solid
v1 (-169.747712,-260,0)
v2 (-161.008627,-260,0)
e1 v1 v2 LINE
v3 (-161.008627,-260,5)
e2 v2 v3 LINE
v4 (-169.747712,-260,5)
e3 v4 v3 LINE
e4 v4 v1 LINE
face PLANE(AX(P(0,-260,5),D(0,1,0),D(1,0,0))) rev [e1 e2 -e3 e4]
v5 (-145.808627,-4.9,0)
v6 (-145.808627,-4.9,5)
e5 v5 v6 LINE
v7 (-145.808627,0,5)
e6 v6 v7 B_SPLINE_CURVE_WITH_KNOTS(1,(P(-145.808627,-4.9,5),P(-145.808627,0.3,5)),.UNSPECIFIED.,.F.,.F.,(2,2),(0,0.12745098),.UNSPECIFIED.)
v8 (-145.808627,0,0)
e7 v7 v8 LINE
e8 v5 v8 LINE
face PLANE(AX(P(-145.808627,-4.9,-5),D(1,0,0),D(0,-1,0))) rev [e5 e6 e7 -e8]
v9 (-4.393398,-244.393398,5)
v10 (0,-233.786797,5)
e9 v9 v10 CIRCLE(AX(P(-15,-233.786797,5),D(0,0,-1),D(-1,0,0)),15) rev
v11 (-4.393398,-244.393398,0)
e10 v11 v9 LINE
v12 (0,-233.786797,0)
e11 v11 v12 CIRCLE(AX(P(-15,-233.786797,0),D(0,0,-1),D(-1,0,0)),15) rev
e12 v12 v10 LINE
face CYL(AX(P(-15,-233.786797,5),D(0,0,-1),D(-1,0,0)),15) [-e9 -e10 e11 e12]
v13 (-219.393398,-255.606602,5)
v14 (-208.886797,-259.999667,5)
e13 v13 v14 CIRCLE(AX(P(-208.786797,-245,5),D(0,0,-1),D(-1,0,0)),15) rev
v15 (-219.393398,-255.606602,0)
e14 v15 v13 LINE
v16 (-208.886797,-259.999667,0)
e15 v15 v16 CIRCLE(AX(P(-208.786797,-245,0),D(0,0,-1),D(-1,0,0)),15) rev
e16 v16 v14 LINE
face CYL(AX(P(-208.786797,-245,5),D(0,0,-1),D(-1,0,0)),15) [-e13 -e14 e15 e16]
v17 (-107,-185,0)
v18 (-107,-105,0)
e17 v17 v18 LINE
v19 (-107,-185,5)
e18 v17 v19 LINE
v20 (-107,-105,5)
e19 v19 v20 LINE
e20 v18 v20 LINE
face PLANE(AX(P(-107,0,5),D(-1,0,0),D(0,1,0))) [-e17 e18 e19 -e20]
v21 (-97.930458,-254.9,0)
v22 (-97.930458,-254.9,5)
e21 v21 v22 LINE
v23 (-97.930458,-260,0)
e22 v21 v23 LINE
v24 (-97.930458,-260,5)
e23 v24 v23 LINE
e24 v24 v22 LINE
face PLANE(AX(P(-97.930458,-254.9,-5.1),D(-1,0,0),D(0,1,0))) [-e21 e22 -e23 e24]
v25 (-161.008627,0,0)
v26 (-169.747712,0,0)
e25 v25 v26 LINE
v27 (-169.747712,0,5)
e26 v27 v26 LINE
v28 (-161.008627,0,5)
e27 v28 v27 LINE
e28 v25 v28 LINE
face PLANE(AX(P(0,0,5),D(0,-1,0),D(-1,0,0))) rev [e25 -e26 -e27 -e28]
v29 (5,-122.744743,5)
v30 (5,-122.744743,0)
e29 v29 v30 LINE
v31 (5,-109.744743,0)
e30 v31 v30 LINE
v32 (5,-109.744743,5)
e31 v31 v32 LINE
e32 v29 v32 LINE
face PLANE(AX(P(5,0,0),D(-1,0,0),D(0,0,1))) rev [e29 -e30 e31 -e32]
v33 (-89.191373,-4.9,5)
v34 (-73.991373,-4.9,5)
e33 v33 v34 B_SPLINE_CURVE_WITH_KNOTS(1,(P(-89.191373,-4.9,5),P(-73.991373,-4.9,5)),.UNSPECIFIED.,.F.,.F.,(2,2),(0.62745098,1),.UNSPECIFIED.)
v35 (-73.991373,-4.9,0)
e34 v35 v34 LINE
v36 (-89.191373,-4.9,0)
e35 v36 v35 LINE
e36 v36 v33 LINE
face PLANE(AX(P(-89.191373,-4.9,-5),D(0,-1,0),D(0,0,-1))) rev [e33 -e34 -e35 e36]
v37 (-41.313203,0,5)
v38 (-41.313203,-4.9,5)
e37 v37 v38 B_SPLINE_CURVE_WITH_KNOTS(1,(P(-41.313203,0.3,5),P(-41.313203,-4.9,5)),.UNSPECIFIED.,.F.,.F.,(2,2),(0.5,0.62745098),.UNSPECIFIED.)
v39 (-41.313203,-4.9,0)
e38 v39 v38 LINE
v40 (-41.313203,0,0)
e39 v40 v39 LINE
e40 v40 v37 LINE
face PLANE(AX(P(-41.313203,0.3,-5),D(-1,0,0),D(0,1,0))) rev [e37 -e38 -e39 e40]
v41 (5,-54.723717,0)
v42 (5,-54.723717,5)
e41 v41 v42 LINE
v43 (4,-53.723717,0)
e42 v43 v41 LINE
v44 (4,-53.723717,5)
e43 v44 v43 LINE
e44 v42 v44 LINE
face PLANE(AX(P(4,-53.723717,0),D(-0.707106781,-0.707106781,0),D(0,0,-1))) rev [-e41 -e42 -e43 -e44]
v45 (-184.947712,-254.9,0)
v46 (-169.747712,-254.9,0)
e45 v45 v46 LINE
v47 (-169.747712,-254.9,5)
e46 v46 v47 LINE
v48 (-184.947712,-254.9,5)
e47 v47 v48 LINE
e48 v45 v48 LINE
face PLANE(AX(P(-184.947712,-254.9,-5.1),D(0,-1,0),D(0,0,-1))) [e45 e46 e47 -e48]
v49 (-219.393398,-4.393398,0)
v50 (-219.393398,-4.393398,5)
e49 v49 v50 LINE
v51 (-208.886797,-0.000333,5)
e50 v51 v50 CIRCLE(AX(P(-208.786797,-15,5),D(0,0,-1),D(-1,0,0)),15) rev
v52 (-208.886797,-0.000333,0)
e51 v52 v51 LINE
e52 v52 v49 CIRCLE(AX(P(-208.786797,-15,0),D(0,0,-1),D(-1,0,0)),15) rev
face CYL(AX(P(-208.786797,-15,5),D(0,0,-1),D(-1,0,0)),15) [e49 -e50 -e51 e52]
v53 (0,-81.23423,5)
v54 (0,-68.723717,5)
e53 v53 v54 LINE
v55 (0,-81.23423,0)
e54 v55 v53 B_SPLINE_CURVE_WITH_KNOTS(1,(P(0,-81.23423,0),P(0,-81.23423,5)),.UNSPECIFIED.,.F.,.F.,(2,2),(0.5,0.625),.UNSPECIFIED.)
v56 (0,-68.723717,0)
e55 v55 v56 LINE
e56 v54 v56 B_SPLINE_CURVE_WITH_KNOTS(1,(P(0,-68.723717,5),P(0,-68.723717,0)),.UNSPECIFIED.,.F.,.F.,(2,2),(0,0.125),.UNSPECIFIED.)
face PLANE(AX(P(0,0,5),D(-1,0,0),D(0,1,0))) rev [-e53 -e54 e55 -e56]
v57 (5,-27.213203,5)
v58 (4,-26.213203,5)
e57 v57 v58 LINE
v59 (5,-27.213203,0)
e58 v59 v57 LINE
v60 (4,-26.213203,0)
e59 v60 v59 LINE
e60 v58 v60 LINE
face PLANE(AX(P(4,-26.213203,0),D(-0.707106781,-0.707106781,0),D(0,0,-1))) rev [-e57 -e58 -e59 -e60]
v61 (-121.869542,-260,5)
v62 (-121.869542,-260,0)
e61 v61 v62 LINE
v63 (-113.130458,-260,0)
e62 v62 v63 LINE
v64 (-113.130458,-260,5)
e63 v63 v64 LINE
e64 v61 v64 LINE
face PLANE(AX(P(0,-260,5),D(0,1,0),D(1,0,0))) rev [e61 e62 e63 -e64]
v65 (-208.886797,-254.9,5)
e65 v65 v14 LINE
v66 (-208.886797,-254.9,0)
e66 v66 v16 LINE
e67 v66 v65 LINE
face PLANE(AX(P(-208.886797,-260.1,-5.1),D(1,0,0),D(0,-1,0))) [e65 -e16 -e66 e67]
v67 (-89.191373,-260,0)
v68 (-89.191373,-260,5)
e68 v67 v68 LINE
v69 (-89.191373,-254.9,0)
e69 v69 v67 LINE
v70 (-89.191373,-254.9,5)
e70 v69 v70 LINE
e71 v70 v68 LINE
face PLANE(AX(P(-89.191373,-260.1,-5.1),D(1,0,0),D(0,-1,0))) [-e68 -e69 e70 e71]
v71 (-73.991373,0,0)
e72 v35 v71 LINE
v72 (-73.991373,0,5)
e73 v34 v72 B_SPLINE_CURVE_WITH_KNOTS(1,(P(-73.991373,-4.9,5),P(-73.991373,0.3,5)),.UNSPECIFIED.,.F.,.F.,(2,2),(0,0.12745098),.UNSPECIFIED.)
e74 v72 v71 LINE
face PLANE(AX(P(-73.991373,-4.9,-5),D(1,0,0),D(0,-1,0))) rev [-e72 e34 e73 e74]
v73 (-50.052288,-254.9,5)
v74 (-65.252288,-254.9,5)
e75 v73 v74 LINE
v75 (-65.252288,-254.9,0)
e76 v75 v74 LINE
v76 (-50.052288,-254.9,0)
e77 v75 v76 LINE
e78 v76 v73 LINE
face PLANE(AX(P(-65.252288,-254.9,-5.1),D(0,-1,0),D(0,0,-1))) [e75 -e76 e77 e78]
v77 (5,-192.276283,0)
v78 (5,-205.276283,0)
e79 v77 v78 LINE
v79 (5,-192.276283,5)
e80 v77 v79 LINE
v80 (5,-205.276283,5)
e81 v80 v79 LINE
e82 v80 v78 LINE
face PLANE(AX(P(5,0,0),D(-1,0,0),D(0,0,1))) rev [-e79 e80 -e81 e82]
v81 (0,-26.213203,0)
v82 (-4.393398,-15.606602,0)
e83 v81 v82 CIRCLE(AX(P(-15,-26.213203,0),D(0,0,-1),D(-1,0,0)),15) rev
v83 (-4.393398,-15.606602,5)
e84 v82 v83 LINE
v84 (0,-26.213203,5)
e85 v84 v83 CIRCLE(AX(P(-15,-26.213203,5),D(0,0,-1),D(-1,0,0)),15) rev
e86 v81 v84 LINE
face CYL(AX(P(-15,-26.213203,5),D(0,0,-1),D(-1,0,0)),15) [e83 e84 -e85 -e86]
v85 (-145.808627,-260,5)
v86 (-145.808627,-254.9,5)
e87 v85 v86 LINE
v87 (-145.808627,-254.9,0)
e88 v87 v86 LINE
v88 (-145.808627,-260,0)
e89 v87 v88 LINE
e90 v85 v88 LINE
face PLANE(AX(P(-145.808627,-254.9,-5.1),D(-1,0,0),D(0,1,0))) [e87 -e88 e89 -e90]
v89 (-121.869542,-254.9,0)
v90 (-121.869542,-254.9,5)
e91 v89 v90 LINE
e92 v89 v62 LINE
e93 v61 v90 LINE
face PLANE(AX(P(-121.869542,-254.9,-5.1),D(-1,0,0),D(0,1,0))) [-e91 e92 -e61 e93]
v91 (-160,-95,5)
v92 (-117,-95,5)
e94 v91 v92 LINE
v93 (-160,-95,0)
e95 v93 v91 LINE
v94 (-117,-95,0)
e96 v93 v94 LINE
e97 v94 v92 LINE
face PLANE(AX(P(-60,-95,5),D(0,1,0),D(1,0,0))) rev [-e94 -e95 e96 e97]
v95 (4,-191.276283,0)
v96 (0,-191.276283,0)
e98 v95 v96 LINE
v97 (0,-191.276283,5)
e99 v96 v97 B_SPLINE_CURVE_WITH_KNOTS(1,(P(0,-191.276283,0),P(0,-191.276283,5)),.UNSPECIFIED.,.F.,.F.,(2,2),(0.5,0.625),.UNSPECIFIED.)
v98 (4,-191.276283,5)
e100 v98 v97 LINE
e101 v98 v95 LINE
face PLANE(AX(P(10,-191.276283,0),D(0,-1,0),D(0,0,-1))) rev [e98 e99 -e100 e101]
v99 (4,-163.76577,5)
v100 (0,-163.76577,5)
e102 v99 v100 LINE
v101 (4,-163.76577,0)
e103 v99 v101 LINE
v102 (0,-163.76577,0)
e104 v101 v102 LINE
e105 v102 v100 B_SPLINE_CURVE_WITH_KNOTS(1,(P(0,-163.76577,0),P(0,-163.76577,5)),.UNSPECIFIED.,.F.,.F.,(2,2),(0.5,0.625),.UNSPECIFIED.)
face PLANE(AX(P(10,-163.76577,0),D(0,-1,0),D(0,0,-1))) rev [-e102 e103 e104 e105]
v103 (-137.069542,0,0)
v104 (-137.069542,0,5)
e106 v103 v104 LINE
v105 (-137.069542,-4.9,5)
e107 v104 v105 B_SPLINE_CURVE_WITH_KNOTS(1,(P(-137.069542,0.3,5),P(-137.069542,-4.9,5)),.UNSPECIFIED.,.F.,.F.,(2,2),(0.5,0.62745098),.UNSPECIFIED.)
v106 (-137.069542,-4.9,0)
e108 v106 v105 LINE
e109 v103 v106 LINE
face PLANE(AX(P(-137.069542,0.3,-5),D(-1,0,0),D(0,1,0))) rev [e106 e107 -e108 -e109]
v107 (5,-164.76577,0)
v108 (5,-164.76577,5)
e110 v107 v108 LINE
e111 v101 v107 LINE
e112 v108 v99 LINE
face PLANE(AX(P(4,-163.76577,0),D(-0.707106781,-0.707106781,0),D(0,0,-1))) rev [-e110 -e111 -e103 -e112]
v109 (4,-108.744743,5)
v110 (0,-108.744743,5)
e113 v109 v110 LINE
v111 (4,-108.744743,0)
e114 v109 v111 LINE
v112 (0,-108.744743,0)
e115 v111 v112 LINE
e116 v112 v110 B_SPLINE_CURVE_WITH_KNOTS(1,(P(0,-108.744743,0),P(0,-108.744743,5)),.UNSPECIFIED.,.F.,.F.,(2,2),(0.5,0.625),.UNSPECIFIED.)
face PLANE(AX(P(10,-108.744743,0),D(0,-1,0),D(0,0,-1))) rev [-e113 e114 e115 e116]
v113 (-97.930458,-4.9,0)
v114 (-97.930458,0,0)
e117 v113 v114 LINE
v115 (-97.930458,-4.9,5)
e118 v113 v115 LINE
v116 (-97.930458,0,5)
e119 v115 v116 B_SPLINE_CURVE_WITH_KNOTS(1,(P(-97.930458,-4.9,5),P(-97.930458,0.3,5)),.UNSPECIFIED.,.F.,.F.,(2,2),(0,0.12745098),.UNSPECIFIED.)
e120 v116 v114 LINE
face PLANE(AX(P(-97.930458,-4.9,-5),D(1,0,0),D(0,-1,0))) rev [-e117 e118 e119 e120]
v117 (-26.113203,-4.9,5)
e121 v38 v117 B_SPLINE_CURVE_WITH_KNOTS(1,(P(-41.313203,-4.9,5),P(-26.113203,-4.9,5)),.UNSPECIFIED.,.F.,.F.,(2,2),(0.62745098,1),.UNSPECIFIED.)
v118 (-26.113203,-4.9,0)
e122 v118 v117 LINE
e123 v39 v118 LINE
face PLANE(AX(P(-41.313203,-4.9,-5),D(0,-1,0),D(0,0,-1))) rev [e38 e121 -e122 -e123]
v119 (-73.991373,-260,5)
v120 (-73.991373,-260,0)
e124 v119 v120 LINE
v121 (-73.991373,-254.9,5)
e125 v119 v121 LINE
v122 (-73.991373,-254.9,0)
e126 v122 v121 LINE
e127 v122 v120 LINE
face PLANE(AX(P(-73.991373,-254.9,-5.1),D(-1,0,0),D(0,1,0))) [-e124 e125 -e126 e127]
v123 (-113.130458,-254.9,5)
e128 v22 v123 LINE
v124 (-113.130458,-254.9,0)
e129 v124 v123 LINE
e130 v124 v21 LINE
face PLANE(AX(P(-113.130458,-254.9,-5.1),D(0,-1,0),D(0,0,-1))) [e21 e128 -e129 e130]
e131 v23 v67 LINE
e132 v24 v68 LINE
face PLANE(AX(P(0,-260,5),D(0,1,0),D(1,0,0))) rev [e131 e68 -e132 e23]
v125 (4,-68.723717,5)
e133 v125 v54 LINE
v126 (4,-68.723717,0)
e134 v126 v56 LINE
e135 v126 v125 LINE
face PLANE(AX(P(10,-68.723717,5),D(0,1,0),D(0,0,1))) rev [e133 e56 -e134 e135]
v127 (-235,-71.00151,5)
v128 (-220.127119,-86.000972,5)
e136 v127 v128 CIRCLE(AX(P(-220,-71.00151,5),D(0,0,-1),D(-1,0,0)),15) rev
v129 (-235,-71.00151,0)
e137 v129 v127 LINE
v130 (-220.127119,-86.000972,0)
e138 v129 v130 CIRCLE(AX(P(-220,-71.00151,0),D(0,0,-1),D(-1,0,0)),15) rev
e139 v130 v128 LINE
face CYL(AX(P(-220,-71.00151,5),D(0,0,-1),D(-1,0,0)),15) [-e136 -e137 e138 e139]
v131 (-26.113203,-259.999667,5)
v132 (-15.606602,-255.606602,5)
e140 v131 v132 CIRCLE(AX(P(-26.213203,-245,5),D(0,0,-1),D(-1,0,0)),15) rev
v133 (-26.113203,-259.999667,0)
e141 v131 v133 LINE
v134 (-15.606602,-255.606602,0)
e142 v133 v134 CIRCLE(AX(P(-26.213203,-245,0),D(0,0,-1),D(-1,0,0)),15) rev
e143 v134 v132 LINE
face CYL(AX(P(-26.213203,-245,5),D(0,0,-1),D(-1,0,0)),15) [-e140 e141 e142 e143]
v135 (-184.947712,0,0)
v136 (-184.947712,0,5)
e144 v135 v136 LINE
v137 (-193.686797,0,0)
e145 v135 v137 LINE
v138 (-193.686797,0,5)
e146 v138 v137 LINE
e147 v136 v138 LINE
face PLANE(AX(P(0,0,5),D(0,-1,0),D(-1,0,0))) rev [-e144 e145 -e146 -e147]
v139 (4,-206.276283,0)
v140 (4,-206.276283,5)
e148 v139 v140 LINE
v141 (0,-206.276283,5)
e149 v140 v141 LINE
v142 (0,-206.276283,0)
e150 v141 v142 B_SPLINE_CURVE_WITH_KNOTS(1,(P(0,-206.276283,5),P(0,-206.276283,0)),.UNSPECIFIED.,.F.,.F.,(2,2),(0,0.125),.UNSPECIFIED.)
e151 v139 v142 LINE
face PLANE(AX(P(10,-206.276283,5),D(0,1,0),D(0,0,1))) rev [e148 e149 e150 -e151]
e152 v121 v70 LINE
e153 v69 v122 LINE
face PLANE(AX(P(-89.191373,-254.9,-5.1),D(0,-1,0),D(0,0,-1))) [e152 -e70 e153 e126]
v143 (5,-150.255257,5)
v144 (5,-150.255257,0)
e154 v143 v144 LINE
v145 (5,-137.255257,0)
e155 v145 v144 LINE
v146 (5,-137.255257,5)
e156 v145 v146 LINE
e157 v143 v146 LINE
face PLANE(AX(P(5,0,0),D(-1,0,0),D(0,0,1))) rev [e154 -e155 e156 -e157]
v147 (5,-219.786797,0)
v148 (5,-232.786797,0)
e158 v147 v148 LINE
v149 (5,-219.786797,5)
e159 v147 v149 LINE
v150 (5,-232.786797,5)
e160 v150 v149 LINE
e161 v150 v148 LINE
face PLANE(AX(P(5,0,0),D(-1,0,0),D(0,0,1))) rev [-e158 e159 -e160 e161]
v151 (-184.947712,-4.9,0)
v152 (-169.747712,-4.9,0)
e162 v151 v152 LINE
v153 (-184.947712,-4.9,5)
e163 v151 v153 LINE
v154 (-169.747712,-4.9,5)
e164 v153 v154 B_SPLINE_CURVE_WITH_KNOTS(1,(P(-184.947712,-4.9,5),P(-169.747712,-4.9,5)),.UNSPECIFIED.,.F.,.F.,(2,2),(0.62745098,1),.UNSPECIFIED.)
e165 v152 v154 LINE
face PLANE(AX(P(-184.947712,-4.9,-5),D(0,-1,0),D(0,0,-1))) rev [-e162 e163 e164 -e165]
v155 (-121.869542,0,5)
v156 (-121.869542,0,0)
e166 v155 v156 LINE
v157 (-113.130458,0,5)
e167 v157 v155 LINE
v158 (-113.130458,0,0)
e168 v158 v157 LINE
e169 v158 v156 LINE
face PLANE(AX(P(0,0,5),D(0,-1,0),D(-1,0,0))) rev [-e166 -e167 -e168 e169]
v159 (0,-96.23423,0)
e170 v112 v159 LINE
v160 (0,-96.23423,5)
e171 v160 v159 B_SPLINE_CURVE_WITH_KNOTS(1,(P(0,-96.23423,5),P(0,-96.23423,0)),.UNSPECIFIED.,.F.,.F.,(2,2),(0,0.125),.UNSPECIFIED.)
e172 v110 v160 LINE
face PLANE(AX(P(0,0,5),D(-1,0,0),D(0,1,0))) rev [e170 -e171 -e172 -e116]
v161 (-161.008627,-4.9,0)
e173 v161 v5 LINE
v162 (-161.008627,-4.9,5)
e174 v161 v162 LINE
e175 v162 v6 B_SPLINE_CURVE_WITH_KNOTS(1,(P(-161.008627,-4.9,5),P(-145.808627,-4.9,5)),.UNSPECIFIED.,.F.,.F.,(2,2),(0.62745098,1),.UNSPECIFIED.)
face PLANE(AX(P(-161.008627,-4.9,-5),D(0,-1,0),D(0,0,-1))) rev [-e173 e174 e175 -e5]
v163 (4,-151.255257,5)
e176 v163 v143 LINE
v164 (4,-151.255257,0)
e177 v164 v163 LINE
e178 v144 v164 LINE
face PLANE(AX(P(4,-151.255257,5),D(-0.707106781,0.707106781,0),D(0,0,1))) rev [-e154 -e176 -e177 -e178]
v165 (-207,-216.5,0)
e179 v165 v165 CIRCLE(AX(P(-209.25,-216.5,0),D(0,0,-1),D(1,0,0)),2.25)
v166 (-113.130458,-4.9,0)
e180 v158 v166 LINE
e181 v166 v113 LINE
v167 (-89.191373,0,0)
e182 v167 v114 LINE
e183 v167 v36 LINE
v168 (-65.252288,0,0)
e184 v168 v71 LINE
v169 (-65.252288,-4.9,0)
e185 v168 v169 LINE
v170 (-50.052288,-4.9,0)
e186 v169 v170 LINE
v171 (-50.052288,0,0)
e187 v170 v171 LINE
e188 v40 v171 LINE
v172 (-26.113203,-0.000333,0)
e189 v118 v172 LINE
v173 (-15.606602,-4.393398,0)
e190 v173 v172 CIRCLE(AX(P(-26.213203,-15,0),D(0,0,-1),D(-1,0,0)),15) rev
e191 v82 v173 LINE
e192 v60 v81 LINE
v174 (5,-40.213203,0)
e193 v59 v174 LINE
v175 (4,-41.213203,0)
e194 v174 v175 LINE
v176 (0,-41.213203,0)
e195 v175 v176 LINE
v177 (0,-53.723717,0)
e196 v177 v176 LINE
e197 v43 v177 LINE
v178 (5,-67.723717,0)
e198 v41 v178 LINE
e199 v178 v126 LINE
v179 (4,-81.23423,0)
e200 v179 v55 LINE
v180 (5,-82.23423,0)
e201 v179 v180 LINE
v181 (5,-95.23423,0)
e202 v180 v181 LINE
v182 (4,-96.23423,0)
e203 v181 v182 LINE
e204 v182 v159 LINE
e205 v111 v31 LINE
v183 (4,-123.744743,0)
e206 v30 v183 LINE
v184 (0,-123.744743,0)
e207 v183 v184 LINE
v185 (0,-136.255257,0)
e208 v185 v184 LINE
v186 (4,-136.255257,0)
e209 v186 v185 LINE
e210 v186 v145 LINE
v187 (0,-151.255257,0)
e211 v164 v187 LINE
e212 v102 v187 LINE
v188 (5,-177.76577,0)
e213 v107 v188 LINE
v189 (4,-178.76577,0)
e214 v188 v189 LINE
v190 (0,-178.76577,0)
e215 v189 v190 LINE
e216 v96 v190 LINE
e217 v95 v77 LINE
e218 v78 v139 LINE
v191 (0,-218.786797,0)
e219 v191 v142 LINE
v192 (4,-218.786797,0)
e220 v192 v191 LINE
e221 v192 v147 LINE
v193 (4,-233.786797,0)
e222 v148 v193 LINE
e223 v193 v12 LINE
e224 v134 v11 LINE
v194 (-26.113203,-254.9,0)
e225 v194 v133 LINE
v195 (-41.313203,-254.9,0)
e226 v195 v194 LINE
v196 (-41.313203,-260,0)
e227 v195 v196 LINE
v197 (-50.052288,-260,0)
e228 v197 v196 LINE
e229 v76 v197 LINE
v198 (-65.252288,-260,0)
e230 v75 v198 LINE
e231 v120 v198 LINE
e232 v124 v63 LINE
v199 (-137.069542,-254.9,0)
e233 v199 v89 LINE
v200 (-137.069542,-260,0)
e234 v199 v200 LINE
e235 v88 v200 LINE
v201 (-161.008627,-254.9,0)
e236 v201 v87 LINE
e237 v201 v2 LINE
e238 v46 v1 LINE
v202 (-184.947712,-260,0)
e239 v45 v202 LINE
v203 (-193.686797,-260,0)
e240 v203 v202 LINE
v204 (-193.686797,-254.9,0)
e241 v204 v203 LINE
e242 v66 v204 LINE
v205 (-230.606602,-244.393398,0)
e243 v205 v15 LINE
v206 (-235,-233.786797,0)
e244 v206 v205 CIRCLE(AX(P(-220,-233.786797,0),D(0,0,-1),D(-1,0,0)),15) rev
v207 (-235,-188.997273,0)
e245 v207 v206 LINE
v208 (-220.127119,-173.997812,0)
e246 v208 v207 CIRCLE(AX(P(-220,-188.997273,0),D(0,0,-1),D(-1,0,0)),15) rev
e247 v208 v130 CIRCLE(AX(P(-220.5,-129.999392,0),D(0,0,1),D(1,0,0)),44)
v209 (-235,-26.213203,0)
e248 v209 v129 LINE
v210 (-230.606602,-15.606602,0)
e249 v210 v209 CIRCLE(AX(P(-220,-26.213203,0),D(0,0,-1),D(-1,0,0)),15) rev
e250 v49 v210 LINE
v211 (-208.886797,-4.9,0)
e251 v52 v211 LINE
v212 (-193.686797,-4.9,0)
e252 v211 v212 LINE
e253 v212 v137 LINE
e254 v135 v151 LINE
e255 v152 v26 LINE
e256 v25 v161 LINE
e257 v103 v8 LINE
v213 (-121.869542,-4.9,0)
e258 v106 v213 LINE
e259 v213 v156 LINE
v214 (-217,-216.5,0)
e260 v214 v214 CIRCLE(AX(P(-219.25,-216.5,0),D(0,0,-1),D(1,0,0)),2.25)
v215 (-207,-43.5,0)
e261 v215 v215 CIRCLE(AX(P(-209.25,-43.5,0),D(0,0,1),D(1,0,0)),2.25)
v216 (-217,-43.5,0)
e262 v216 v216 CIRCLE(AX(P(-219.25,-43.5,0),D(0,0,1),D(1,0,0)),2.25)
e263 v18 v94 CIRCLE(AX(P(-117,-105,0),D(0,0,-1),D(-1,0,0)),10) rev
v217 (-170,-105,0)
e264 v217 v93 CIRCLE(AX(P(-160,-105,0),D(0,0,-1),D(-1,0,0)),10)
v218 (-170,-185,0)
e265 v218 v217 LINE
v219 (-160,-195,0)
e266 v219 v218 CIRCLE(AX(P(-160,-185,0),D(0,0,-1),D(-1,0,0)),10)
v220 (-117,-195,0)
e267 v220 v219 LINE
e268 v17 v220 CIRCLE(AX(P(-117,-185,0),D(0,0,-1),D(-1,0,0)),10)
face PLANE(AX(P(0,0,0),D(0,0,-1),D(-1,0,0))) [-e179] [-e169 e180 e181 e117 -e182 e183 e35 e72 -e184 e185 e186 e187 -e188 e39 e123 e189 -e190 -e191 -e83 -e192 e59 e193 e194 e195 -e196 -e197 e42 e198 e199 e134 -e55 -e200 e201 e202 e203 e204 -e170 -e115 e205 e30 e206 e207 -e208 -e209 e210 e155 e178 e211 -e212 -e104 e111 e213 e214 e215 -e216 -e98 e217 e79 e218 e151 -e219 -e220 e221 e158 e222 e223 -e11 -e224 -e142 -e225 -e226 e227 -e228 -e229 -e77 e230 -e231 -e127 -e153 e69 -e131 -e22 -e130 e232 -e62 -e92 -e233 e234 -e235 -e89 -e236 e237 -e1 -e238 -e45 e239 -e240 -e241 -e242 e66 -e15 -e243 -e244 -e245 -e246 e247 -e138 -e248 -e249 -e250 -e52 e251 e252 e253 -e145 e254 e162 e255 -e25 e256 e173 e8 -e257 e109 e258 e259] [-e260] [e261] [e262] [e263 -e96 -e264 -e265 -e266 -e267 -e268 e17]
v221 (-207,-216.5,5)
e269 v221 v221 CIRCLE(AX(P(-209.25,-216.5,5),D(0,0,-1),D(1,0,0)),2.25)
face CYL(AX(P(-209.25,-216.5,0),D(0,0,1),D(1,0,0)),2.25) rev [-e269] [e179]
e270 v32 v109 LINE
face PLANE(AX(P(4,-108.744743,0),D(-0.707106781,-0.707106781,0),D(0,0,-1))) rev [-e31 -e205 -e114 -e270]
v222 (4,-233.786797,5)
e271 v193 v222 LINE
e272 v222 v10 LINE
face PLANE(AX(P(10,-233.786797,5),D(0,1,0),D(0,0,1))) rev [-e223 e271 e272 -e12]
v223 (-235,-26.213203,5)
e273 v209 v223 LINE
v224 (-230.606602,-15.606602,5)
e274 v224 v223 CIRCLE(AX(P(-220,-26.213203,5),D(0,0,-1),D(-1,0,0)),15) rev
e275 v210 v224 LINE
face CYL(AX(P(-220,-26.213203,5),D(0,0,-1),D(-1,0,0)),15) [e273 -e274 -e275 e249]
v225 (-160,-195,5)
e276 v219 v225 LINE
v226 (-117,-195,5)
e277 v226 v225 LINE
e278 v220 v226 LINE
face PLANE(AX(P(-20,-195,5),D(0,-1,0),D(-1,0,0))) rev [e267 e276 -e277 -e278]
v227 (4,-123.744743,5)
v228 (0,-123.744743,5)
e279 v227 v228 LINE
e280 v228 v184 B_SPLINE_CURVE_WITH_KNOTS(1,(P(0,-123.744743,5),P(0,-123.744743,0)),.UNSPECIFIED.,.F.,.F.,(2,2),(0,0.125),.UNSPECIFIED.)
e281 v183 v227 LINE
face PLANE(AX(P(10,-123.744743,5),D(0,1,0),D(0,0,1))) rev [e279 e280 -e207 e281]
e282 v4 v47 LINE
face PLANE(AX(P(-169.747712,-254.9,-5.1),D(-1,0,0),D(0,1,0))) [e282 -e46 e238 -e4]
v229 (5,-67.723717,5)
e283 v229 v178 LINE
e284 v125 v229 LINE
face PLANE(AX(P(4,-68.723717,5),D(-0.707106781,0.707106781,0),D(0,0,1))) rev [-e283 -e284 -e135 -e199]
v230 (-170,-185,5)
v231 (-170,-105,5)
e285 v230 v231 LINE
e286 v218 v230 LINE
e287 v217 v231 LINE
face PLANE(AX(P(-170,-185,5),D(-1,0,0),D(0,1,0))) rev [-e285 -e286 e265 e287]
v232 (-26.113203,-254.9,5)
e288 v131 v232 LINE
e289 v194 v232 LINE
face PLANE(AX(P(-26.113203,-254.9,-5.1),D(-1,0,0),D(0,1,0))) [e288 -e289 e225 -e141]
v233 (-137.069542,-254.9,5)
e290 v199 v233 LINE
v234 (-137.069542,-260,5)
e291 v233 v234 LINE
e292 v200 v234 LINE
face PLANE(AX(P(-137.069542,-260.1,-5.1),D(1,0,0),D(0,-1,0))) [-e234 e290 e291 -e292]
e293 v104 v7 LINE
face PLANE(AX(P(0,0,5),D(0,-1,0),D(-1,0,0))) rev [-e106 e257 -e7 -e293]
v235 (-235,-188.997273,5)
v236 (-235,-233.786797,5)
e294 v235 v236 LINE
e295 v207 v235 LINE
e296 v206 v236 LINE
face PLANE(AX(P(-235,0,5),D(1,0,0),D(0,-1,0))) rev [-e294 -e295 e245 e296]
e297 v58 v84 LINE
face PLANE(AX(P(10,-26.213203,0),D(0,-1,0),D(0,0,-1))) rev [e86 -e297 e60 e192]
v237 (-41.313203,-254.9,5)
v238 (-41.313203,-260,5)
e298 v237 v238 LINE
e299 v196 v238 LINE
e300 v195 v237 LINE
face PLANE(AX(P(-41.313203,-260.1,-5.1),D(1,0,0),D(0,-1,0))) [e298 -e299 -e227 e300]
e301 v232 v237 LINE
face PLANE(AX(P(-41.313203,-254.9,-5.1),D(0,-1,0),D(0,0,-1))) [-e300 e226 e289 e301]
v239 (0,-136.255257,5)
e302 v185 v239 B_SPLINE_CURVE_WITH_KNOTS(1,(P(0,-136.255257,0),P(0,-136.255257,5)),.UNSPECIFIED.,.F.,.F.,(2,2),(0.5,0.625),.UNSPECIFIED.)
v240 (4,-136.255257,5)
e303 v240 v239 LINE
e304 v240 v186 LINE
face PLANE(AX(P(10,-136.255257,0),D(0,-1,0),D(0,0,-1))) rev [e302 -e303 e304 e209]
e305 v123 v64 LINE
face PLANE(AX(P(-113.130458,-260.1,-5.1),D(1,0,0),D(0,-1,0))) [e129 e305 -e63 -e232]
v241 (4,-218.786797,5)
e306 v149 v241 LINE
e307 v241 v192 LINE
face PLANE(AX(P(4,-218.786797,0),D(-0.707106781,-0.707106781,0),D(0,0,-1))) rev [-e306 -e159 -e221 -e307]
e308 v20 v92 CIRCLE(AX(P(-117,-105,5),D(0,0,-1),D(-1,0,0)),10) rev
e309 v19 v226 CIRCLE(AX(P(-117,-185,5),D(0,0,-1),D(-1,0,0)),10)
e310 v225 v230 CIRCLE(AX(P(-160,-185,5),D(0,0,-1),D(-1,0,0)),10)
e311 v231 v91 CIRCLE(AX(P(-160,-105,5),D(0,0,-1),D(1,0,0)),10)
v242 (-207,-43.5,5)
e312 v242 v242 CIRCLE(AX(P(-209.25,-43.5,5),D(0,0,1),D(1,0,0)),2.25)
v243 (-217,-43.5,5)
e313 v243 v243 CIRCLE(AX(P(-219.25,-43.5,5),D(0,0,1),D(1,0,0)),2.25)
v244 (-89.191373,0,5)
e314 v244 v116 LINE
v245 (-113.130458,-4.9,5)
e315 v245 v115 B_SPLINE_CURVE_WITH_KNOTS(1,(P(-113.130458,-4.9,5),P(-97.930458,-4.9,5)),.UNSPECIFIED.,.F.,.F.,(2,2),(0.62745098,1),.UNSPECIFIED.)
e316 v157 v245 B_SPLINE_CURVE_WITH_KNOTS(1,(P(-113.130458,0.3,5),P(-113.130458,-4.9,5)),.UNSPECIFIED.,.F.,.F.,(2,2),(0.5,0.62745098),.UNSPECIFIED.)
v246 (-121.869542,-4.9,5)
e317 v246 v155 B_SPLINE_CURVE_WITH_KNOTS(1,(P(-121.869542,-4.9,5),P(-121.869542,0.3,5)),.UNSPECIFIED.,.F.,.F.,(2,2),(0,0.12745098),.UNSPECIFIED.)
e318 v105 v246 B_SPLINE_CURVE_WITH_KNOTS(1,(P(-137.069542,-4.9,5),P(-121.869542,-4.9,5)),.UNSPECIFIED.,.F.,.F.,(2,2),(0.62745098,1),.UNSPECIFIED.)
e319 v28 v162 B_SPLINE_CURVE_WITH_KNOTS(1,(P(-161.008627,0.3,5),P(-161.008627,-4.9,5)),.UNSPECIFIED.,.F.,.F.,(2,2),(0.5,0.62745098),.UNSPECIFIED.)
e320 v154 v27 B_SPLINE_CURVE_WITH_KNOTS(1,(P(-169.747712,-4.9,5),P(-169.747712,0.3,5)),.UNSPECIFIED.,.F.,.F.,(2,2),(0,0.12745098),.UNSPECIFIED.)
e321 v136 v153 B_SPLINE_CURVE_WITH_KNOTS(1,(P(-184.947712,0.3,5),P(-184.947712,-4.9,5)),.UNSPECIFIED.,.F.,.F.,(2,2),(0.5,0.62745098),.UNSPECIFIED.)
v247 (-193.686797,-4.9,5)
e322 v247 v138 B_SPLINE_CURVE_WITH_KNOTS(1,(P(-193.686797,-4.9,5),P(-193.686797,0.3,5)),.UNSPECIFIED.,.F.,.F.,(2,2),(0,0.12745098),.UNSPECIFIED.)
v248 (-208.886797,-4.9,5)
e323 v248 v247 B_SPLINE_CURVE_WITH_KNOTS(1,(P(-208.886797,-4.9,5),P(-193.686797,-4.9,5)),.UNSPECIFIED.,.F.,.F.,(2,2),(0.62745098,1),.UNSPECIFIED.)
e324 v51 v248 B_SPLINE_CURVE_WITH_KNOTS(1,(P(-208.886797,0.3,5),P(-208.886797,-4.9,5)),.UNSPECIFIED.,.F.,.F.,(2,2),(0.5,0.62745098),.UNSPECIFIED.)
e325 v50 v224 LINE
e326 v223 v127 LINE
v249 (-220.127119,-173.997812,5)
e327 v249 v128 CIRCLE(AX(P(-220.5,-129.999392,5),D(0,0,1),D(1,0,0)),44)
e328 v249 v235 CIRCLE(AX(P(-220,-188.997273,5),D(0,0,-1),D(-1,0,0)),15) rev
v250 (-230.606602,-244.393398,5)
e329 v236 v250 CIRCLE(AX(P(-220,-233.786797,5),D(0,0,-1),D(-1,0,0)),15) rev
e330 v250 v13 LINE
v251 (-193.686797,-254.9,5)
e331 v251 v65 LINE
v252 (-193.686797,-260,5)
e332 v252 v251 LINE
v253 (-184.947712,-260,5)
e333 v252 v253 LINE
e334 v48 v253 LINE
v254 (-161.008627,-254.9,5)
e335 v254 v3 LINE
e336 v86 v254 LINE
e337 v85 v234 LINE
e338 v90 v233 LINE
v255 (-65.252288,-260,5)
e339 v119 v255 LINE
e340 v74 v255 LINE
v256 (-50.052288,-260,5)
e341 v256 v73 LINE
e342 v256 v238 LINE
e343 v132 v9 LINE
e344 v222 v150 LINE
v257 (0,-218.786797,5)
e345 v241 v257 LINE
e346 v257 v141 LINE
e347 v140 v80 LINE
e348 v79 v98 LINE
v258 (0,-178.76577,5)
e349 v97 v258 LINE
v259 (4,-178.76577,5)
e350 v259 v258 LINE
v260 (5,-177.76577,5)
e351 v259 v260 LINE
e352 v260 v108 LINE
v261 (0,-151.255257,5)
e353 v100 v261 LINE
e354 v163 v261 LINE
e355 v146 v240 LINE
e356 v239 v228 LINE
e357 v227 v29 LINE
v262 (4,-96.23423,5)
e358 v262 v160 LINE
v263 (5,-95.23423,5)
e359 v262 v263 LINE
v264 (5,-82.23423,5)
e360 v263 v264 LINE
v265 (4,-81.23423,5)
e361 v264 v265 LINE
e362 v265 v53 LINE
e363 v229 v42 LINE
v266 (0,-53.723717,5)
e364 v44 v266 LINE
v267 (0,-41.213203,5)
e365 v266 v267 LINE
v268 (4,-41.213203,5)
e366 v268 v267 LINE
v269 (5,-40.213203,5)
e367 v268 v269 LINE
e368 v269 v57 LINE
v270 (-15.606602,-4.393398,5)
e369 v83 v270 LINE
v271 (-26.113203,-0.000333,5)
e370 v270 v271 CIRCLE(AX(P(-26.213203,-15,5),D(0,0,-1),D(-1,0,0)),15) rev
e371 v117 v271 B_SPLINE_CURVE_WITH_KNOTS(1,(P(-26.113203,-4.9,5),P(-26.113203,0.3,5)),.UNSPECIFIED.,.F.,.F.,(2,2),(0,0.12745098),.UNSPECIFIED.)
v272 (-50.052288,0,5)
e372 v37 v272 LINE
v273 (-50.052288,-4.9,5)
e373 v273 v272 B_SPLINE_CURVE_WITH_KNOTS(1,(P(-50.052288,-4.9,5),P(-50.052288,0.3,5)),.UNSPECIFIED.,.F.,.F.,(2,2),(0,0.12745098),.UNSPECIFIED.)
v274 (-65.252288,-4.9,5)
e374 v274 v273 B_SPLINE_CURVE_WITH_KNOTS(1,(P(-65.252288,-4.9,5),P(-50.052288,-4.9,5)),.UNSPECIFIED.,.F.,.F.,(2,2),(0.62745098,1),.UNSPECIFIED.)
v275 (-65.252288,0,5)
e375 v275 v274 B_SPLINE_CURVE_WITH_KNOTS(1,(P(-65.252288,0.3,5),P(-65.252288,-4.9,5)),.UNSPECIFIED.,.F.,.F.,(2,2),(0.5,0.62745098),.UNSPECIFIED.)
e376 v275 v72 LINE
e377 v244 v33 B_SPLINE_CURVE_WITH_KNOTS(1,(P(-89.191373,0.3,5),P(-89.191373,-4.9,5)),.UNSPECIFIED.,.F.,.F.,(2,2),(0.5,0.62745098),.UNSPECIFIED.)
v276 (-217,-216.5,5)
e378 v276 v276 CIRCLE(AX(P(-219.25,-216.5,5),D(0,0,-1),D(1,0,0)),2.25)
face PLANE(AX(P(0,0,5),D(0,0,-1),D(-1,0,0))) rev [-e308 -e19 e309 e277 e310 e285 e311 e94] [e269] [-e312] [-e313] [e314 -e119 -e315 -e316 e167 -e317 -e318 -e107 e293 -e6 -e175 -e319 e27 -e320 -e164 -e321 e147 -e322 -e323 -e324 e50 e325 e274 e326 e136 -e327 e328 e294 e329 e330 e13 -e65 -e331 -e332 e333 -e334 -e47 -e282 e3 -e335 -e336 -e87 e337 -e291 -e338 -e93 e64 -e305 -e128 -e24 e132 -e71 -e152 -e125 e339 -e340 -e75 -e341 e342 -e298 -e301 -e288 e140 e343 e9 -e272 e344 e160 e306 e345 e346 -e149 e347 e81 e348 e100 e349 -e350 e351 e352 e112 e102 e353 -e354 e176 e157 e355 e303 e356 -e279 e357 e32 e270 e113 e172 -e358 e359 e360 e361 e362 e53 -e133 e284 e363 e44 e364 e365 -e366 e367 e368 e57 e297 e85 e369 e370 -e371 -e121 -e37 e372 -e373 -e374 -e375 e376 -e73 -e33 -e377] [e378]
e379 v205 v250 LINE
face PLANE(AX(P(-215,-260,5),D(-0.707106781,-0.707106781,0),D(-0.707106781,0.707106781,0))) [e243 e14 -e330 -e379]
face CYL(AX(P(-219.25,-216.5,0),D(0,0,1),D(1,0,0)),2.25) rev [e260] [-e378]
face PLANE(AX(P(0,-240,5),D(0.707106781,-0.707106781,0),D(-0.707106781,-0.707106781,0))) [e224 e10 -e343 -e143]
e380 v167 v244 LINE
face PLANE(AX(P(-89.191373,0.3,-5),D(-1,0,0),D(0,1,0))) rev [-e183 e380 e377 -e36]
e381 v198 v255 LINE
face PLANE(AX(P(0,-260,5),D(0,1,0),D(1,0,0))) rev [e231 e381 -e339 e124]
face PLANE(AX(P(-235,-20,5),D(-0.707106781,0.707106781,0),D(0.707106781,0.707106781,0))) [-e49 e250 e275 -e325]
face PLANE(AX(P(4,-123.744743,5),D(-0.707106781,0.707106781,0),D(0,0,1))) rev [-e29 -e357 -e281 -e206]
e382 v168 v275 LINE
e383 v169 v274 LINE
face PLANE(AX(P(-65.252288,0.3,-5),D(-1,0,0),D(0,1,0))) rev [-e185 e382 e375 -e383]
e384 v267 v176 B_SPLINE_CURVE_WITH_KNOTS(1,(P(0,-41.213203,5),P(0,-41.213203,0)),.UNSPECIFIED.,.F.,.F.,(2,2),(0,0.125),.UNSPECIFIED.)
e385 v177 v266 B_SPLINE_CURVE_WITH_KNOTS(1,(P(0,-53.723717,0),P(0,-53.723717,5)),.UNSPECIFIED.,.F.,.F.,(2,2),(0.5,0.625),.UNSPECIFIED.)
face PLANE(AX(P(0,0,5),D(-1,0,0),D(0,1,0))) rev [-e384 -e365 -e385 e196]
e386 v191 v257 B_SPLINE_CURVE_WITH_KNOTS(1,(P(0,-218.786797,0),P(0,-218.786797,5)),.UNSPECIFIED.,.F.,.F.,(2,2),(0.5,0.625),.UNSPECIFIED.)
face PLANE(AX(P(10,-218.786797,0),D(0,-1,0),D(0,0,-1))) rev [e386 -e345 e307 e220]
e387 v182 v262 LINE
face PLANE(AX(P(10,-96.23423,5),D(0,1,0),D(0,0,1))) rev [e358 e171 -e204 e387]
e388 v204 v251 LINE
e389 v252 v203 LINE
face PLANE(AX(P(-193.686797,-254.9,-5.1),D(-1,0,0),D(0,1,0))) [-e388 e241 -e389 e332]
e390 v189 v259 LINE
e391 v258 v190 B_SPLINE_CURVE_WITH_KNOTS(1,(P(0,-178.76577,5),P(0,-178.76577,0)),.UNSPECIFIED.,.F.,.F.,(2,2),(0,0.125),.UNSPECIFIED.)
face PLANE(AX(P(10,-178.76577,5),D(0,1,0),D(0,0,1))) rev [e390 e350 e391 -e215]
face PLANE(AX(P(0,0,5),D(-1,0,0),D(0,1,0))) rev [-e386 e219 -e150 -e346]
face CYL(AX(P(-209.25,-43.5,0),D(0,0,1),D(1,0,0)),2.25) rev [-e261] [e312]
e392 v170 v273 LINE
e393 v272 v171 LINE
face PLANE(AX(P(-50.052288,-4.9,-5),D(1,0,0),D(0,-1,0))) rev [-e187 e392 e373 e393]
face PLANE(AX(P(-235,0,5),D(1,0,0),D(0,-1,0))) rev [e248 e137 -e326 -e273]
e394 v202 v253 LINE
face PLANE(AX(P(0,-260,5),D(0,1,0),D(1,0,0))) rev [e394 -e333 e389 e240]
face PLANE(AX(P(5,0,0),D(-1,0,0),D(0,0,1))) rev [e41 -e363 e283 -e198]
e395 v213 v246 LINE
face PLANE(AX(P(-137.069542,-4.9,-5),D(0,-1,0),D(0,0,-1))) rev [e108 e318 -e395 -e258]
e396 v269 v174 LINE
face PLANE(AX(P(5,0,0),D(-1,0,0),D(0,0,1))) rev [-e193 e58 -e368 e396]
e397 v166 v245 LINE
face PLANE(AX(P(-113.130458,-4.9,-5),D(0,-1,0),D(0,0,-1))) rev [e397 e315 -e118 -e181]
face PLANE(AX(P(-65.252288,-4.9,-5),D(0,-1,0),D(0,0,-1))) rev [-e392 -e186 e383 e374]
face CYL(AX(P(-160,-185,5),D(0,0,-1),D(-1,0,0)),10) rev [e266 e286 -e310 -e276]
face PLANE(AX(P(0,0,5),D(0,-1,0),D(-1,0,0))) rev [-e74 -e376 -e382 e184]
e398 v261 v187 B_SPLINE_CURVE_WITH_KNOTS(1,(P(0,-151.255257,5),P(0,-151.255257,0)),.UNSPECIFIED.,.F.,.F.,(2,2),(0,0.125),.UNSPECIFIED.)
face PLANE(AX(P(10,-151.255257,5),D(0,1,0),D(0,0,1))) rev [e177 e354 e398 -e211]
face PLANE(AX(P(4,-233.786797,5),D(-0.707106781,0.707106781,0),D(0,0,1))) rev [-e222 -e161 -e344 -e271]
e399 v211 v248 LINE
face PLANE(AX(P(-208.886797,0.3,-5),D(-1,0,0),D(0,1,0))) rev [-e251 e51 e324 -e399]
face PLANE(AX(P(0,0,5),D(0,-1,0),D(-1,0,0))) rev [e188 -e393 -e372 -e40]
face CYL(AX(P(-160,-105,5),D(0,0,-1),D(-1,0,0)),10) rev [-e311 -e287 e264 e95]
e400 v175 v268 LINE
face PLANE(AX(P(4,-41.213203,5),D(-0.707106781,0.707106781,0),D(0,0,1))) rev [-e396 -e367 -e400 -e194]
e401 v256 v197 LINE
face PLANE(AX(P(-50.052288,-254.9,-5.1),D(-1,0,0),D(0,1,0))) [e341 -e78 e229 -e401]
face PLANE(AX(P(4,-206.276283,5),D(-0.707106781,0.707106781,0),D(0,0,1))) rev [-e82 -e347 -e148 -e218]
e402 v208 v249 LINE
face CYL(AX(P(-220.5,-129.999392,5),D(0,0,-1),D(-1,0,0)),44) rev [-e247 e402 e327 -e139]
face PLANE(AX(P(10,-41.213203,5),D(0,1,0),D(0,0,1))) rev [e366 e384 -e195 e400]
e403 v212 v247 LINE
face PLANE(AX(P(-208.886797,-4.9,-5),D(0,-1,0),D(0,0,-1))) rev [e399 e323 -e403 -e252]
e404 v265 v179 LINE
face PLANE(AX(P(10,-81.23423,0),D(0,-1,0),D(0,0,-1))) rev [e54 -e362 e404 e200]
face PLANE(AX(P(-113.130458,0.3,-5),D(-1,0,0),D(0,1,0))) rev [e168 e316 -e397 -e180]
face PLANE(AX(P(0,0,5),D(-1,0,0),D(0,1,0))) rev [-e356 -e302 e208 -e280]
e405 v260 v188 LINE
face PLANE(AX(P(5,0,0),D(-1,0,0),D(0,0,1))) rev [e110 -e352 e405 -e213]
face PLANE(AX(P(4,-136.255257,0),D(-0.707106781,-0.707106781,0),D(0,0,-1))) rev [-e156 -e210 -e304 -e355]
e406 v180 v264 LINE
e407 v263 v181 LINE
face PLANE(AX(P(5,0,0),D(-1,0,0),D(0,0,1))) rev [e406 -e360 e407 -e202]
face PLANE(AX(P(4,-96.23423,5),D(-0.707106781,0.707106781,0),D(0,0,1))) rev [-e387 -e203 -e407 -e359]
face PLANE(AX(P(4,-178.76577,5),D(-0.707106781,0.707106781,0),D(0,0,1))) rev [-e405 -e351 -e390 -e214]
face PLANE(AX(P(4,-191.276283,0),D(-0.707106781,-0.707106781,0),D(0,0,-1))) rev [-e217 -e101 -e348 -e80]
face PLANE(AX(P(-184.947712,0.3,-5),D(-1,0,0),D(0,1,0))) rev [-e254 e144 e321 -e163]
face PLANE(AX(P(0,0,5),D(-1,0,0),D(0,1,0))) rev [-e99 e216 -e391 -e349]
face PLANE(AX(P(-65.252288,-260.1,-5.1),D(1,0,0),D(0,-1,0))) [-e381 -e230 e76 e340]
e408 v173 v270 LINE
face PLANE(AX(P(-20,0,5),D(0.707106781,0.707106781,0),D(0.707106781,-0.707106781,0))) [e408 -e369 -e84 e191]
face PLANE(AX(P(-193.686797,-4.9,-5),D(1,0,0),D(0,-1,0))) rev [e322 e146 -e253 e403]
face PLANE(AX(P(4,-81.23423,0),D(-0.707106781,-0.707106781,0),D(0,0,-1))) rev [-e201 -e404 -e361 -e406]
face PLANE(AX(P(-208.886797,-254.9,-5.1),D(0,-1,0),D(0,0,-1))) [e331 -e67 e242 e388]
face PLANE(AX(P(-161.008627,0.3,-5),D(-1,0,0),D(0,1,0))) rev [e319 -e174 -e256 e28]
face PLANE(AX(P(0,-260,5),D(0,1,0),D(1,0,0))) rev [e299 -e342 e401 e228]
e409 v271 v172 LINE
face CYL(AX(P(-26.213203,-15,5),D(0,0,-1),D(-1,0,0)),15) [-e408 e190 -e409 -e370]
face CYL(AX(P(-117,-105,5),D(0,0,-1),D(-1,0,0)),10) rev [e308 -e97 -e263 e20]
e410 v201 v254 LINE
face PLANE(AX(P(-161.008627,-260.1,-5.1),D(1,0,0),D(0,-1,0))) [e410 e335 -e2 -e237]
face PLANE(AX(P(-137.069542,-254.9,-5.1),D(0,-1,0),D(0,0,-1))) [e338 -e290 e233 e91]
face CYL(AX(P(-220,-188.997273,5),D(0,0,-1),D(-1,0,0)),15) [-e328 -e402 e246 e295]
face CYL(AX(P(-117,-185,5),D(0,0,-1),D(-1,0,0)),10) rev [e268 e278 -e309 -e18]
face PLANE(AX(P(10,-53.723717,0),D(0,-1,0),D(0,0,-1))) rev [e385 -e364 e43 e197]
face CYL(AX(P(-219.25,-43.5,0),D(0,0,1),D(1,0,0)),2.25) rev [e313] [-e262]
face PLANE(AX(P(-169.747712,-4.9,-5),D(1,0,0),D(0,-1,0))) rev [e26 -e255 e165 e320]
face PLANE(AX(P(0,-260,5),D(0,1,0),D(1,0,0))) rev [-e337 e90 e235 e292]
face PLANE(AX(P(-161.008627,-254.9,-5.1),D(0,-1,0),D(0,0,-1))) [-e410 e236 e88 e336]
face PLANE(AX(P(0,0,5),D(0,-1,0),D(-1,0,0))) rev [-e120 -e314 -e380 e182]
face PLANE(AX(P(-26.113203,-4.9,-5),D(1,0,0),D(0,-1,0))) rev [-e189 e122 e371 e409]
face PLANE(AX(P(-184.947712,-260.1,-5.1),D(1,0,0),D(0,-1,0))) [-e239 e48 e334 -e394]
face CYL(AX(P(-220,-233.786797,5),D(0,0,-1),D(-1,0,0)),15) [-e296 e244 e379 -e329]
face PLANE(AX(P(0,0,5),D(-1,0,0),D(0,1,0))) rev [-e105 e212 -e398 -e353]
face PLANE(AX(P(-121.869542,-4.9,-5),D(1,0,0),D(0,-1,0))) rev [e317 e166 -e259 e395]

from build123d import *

# Parameters (mm, degrees)
ESQUISSE1_W                            = 235
ESQUISSE1_H                            = 260
BOSS_EXTRU_1_DEPTH                     = 5
ENL_V_MAT_EXTRU_1_DEPTH                = 351.499643366
CHANFREIN1_SIZE                        = 20
CONG_1_R                               = 15
CHANFREIN2_SIZE                        = 20
CONG_2_R                               = 15
ENL_V_MAT_EXTRU_2_DEPTH                = 351.499643366
CHANFREIN3_SIZE                        = 20
CHANFREIN4_SIZE                        = 20
CONG_3_R                               = 15
BOSS_EXTRU_3_DEPTH                     = 5
TENON_ET_MORTAISE_TENON1_DEPTH         = 5
TENON_START                            = -260
TENON_ET_MORTAISE_RAINURE1_OUTLINE_W   = 15.2
TENON_ET_MORTAISE_RAINURE1_OUTLINE_H   = 5
TENON_ET_MORTAISE_RAINURE1_DEPTH       = 5.1
TENON_START_2                          = -208.886796564
TENON_ET_MORTAISE_RAINURE2_OUTLINE_W   = 4.9
TENON_ET_MORTAISE_RAINURE2_OUTLINE_H   = 5
TENON_ET_MORTAISE_RAINURE2_DEPTH       = 15.2
TENON_START_3                          = -184.947711832
TENON_ET_MORTAISE_RAINURE2_2_OUTLINE_W = 4.9
TENON_ET_MORTAISE_RAINURE2_2_OUTLINE_H = 5
TENON_ET_MORTAISE_RAINURE2_2_DEPTH     = 15.2
TENON_START_4                          = -161.008627099
TENON_ET_MORTAISE_RAINURE2_3_OUTLINE_W = 4.9
TENON_ET_MORTAISE_RAINURE2_3_OUTLINE_H = 5
TENON_ET_MORTAISE_RAINURE2_3_DEPTH     = 15.2
TENON_START_5                          = -137.069542366
TENON_ET_MORTAISE_RAINURE2_4_OUTLINE_W = 4.9
TENON_ET_MORTAISE_RAINURE2_4_OUTLINE_H = 5
TENON_ET_MORTAISE_RAINURE2_4_DEPTH     = 15.2
TENON_START_6                          = -113.130457634
TENON_ET_MORTAISE_RAINURE2_5_OUTLINE_W = 4.9
TENON_ET_MORTAISE_RAINURE2_5_OUTLINE_H = 5
TENON_ET_MORTAISE_RAINURE2_5_DEPTH     = 15.2
TENON_START_7                          = -89.191372901
TENON_ET_MORTAISE_RAINURE2_6_OUTLINE_W = 4.9
TENON_ET_MORTAISE_RAINURE2_6_OUTLINE_H = 5
TENON_ET_MORTAISE_RAINURE2_6_DEPTH     = 15.2
TENON_START_8                          = -65.252288168
TENON_ET_MORTAISE_RAINURE2_7_OUTLINE_W = 4.9
TENON_ET_MORTAISE_RAINURE2_7_OUTLINE_H = 5
TENON_ET_MORTAISE_RAINURE2_7_DEPTH     = 15.2
TENON_START_9                          = -41.313203436
TENON_ET_MORTAISE_RAINURE2_8_OUTLINE_W = 4.9
TENON_ET_MORTAISE_RAINURE2_8_OUTLINE_H = 5
TENON_ET_MORTAISE_RAINURE2_8_DEPTH     = 15.2
ESQUISSE6_R                            = 2.25
ENL_V_MAT_EXTRU_3_DEPTH                = 351.499643366


# Read off the part's stored shape, not the designer's step: Tenon et mortaise-Tenon1, Tenon et mortaise-Rainure1, Tenon et mortaise-Rainure2
with BuildPart() as part:
    # Esquisse1 → Boss.-Extru.1 (new body)
    with BuildSketch(Plane.XY):
        with Locations((-117.5, -130)):
            Rectangle(ESQUISSE1_W, ESQUISSE1_H)
    extrude(amount=BOSS_EXTRU_1_DEPTH)

    # Esquisse2 → Enlèv. mat.-Extru.1 (cut, through all)
    with BuildSketch(Plane.XY.offset(5)):
        with BuildLine():
            Line((-235, -88.457244293), (-235, -171.541538838))
            ThreePointArc((-235, -171.541538838), (-176.5, -129.999391565), (-235, -88.457244293))
        make_face()
    extrude(amount=-ENL_V_MAT_EXTRU_1_DEPTH, mode=Mode.SUBTRACT)

    # Chanfrein1
    chanfrein1_edges = [part.edges().sort_by_distance(p)[0] for p in [
        (-235, -260, 2.5),
    ]]
    chamfer(chanfrein1_edges, length=CHANFREIN1_SIZE)

    # Congé1
    cong_1_edges = [part.edges().sort_by_distance(p)[0] for p in [
        (-215, -260, 2.5),
        (-235, -240, 2.5),
    ]]
    fillet(cong_1_edges, radius=CONG_1_R)

    # Chanfrein2
    chanfrein2_edges = [part.edges().sort_by_distance(p)[0] for p in [
        (-235, 0, 2.5),
    ]]
    chamfer(chanfrein2_edges, length=CHANFREIN2_SIZE)

    # Congé2
    cong_2_edges = [part.edges().sort_by_distance(p)[0] for p in [
        (-235, -20, 2.5),
        (-215, 0, 2.5),
    ]]
    fillet(cong_2_edges, radius=CONG_2_R)

    # Esquisse4 → Enlèv. mat.-Extru.2 (cut, through all)
    with BuildSketch(Plane(origin=(0, 0, 0), x_dir=(-1, 0, 0), z_dir=(0, 0, -1))):
        with BuildLine():
            Line((20, -195), (160, -195))
            ThreePointArc((160, -195), (167.071067812, -192.071067812), (170, -185))
            Line((170, -185), (170, -105))
            ThreePointArc((170, -105), (167.071067812, -97.928932188), (160, -95))
            Line((160, -95), (60, -95))
            ThreePointArc((60, -95), (52.928932188, -97.928932188), (50, -105))
            Line((50, -105), (50, -135))
            ThreePointArc((50, -135), (47.071067812, -142.071067812), (40, -145))
            Line((40, -145), (20, -145))
            ThreePointArc((20, -145), (12.928932188, -147.928932188), (10, -155))
            Line((10, -155), (10, -185))
            ThreePointArc((10, -185), (12.928932188, -192.071067812), (20, -195))
        make_face()
    extrude(amount=-ENL_V_MAT_EXTRU_2_DEPTH, mode=Mode.SUBTRACT)

    # Chanfrein3
    chanfrein3_edges = [part.edges().sort_by_distance(p)[0] for p in [
        (0, -260, 2.5),
    ]]
    chamfer(chanfrein3_edges, length=CHANFREIN3_SIZE)

    # Chanfrein4
    chanfrein4_edges = [part.edges().sort_by_distance(p)[0] for p in [
        (0, 0, 2.5),
    ]]
    chamfer(chanfrein4_edges, length=CHANFREIN4_SIZE)

    # Congé3
    cong_3_edges = [part.edges().sort_by_distance(p)[0] for p in [
        (0, -240, 2.5),
        (-20, -260, 2.5),
        (-20, 0, 2.5),
        (0, -20, 2.5),
        (-235, -171.541538838, 2.5),
        (-235, -88.457244293, 2.5),
    ]]
    fillet(cong_3_edges, radius=CONG_3_R)

    # Esquisse5 → Boss.-Extru.3 (add, through all)
    with BuildSketch(Plane(origin=(0, 0, 0), x_dir=(-1, 0, 0), z_dir=(0, 0, -1))):
        with BuildLine():
            ThreePointArc((117, -195), (109.928932188, -192.071067812), (107, -185))
            Line((107, -185), (107, -105))
            ThreePointArc((107, -105), (109.928932188, -97.928932188), (117, -95))
            Line((117, -95), (60, -95))
            ThreePointArc((60, -95), (52.928932188, -97.928932188), (50, -105))
            Line((50, -105), (50, -135))
            ThreePointArc((50, -135), (47.071067812, -142.071067812), (40, -145))
            Line((40, -145), (20, -145))
            ThreePointArc((20, -145), (12.928932188, -147.928932188), (10, -155))
            Line((10, -155), (10, -185))
            ThreePointArc((10, -185), (12.928932188, -192.071067812), (20, -195))
            Line((20, -195), (117, -195))
        make_face()
    extrude(amount=-BOSS_EXTRU_3_DEPTH)

    # Tenon et mortaise-Tenon1 outline → Tenon et mortaise-Tenon1 (add)
    with BuildSketch(Plane.XY):
        Polygon((0, -26.213203436), (0, -41.213203436), (4, -41.213203436), (5, -40.213203436), (5, -27.213203436), (4, -26.213203436), align=None)
        Polygon((0, -53.72371674), (0, -68.72371674), (4, -68.72371674), (5, -67.72371674), (5, -54.72371674), (4, -53.72371674), align=None)
        Polygon((0, -81.234230044), (0, -96.234230044), (4, -96.234230044), (5, -95.234230044), (5, -82.234230044), (4, -81.234230044), align=None)
        Polygon((0, -108.744743348), (0, -123.744743348), (4, -123.744743348), (5, -122.744743348), (5, -109.744743348), (4, -108.744743348), align=None)
        Polygon((0, -136.255256652), (0, -151.255256652), (4, -151.255256652), (5, -150.255256652), (5, -137.255256652), (4, -136.255256652), align=None)
        Polygon((0, -163.765769956), (0, -178.765769956), (4, -178.765769956), (5, -177.765769956), (5, -164.765769956), (4, -163.765769956), align=None)
        Polygon((0, -191.27628326), (0, -206.27628326), (4, -206.27628326), (5, -205.27628326), (5, -192.27628326), (4, -191.27628326), align=None)
        Polygon((4, -218.786796564), (0, -218.786796564), (0, -233.786796564), (4, -233.786796564), (5, -232.786796564), (5, -219.786796564), align=None)
    extrude(amount=TENON_ET_MORTAISE_TENON1_DEPTH)

    # Tenon et mortaise-Rainure1 outline → Tenon et mortaise-Rainure1 (cut)
    with BuildSketch(Plane(origin=(0, 0, 0), x_dir=(1, 0, 0), z_dir=(0, 1, 0)).offset(TENON_START)):
        with Locations((-33.713203436, -2.5)):
            Rectangle(TENON_ET_MORTAISE_RAINURE1_OUTLINE_W, TENON_ET_MORTAISE_RAINURE1_OUTLINE_H)
        with Locations((-57.652288168, -2.5)):
            Rectangle(TENON_ET_MORTAISE_RAINURE1_OUTLINE_W, TENON_ET_MORTAISE_RAINURE1_OUTLINE_H)
        with Locations((-81.591372901, -2.5)):
            Rectangle(TENON_ET_MORTAISE_RAINURE1_OUTLINE_W, TENON_ET_MORTAISE_RAINURE1_OUTLINE_H)
        with Locations((-105.530457634, -2.5)):
            Rectangle(TENON_ET_MORTAISE_RAINURE1_OUTLINE_W, TENON_ET_MORTAISE_RAINURE1_OUTLINE_H)
        with Locations((-129.469542366, -2.5)):
            Rectangle(TENON_ET_MORTAISE_RAINURE1_OUTLINE_W, TENON_ET_MORTAISE_RAINURE1_OUTLINE_H)
        with Locations((-153.408627099, -2.5)):
            Rectangle(TENON_ET_MORTAISE_RAINURE1_OUTLINE_W, TENON_ET_MORTAISE_RAINURE1_OUTLINE_H)
        with Locations((-177.347711832, -2.5)):
            Rectangle(TENON_ET_MORTAISE_RAINURE1_OUTLINE_W, TENON_ET_MORTAISE_RAINURE1_OUTLINE_H)
        with Locations((-201.286796564, -2.5)):
            Rectangle(TENON_ET_MORTAISE_RAINURE1_OUTLINE_W, TENON_ET_MORTAISE_RAINURE1_OUTLINE_H)
    extrude(amount=TENON_ET_MORTAISE_RAINURE1_DEPTH, mode=Mode.SUBTRACT)

    # Tenon et mortaise-Rainure2 outline → Tenon et mortaise-Rainure2 (cut)
    with BuildSketch(Plane.YZ.offset(TENON_START_2)):
        with Locations((-2.45, 2.5)):
            Rectangle(TENON_ET_MORTAISE_RAINURE2_OUTLINE_W, TENON_ET_MORTAISE_RAINURE2_OUTLINE_H)
    extrude(amount=TENON_ET_MORTAISE_RAINURE2_DEPTH, mode=Mode.SUBTRACT)

    # Tenon et mortaise-Rainure2 2 outline → Tenon et mortaise-Rainure2 2 (cut)
    with BuildSketch(Plane.YZ.offset(TENON_START_3)):
        with Locations((-2.45, 2.5)):
            Rectangle(TENON_ET_MORTAISE_RAINURE2_2_OUTLINE_W, TENON_ET_MORTAISE_RAINURE2_2_OUTLINE_H)
    extrude(amount=TENON_ET_MORTAISE_RAINURE2_2_DEPTH, mode=Mode.SUBTRACT)

    # Tenon et mortaise-Rainure2 3 outline → Tenon et mortaise-Rainure2 3 (cut)
    with BuildSketch(Plane.YZ.offset(TENON_START_4)):
        with Locations((-2.45, 2.5)):
            Rectangle(TENON_ET_MORTAISE_RAINURE2_3_OUTLINE_W, TENON_ET_MORTAISE_RAINURE2_3_OUTLINE_H)
    extrude(amount=TENON_ET_MORTAISE_RAINURE2_3_DEPTH, mode=Mode.SUBTRACT)

    # Tenon et mortaise-Rainure2 4 outline → Tenon et mortaise-Rainure2 4 (cut)
    with BuildSketch(Plane.YZ.offset(TENON_START_5)):
        with Locations((-2.45, 2.5)):
            Rectangle(TENON_ET_MORTAISE_RAINURE2_4_OUTLINE_W, TENON_ET_MORTAISE_RAINURE2_4_OUTLINE_H)
    extrude(amount=TENON_ET_MORTAISE_RAINURE2_4_DEPTH, mode=Mode.SUBTRACT)

    # Tenon et mortaise-Rainure2 5 outline → Tenon et mortaise-Rainure2 5 (cut)
    with BuildSketch(Plane.YZ.offset(TENON_START_6)):
        with Locations((-2.45, 2.5)):
            Rectangle(TENON_ET_MORTAISE_RAINURE2_5_OUTLINE_W, TENON_ET_MORTAISE_RAINURE2_5_OUTLINE_H)
    extrude(amount=TENON_ET_MORTAISE_RAINURE2_5_DEPTH, mode=Mode.SUBTRACT)

    # Tenon et mortaise-Rainure2 6 outline → Tenon et mortaise-Rainure2 6 (cut)
    with BuildSketch(Plane.YZ.offset(TENON_START_7)):
        with Locations((-2.45, 2.5)):
            Rectangle(TENON_ET_MORTAISE_RAINURE2_6_OUTLINE_W, TENON_ET_MORTAISE_RAINURE2_6_OUTLINE_H)
    extrude(amount=TENON_ET_MORTAISE_RAINURE2_6_DEPTH, mode=Mode.SUBTRACT)

    # Tenon et mortaise-Rainure2 7 outline → Tenon et mortaise-Rainure2 7 (cut)
    with BuildSketch(Plane.YZ.offset(TENON_START_8)):
        with Locations((-2.45, 2.5)):
            Rectangle(TENON_ET_MORTAISE_RAINURE2_7_OUTLINE_W, TENON_ET_MORTAISE_RAINURE2_7_OUTLINE_H)
    extrude(amount=TENON_ET_MORTAISE_RAINURE2_7_DEPTH, mode=Mode.SUBTRACT)

    # Tenon et mortaise-Rainure2 8 outline → Tenon et mortaise-Rainure2 8 (cut)
    with BuildSketch(Plane.YZ.offset(TENON_START_9)):
        with Locations((-2.45, 2.5)):
            Rectangle(TENON_ET_MORTAISE_RAINURE2_8_OUTLINE_W, TENON_ET_MORTAISE_RAINURE2_8_OUTLINE_H)
    extrude(amount=TENON_ET_MORTAISE_RAINURE2_8_DEPTH, mode=Mode.SUBTRACT)

    # Esquisse6 → Enlèv. mat.-Extru.3 (cut, through all)
    with BuildSketch(Plane.XY.offset(5)):
        with Locations((-209.25, -43.5)):
            Circle(ESQUISSE6_R)
        with Locations((-219.25, -43.5)):
            Circle(ESQUISSE6_R)
    enl_v_mat_extru_3 = extrude(amount=-ENL_V_MAT_EXTRU_3_DEPTH, mode=Mode.SUBTRACT)

    # Symétrie1: Enlèv. mat.-Extru.3 across plane
    add(enl_v_mat_extru_3.mirror(Plane.ZX.offset(-130)), mode=Mode.SUBTRACT)


solid = part.part
